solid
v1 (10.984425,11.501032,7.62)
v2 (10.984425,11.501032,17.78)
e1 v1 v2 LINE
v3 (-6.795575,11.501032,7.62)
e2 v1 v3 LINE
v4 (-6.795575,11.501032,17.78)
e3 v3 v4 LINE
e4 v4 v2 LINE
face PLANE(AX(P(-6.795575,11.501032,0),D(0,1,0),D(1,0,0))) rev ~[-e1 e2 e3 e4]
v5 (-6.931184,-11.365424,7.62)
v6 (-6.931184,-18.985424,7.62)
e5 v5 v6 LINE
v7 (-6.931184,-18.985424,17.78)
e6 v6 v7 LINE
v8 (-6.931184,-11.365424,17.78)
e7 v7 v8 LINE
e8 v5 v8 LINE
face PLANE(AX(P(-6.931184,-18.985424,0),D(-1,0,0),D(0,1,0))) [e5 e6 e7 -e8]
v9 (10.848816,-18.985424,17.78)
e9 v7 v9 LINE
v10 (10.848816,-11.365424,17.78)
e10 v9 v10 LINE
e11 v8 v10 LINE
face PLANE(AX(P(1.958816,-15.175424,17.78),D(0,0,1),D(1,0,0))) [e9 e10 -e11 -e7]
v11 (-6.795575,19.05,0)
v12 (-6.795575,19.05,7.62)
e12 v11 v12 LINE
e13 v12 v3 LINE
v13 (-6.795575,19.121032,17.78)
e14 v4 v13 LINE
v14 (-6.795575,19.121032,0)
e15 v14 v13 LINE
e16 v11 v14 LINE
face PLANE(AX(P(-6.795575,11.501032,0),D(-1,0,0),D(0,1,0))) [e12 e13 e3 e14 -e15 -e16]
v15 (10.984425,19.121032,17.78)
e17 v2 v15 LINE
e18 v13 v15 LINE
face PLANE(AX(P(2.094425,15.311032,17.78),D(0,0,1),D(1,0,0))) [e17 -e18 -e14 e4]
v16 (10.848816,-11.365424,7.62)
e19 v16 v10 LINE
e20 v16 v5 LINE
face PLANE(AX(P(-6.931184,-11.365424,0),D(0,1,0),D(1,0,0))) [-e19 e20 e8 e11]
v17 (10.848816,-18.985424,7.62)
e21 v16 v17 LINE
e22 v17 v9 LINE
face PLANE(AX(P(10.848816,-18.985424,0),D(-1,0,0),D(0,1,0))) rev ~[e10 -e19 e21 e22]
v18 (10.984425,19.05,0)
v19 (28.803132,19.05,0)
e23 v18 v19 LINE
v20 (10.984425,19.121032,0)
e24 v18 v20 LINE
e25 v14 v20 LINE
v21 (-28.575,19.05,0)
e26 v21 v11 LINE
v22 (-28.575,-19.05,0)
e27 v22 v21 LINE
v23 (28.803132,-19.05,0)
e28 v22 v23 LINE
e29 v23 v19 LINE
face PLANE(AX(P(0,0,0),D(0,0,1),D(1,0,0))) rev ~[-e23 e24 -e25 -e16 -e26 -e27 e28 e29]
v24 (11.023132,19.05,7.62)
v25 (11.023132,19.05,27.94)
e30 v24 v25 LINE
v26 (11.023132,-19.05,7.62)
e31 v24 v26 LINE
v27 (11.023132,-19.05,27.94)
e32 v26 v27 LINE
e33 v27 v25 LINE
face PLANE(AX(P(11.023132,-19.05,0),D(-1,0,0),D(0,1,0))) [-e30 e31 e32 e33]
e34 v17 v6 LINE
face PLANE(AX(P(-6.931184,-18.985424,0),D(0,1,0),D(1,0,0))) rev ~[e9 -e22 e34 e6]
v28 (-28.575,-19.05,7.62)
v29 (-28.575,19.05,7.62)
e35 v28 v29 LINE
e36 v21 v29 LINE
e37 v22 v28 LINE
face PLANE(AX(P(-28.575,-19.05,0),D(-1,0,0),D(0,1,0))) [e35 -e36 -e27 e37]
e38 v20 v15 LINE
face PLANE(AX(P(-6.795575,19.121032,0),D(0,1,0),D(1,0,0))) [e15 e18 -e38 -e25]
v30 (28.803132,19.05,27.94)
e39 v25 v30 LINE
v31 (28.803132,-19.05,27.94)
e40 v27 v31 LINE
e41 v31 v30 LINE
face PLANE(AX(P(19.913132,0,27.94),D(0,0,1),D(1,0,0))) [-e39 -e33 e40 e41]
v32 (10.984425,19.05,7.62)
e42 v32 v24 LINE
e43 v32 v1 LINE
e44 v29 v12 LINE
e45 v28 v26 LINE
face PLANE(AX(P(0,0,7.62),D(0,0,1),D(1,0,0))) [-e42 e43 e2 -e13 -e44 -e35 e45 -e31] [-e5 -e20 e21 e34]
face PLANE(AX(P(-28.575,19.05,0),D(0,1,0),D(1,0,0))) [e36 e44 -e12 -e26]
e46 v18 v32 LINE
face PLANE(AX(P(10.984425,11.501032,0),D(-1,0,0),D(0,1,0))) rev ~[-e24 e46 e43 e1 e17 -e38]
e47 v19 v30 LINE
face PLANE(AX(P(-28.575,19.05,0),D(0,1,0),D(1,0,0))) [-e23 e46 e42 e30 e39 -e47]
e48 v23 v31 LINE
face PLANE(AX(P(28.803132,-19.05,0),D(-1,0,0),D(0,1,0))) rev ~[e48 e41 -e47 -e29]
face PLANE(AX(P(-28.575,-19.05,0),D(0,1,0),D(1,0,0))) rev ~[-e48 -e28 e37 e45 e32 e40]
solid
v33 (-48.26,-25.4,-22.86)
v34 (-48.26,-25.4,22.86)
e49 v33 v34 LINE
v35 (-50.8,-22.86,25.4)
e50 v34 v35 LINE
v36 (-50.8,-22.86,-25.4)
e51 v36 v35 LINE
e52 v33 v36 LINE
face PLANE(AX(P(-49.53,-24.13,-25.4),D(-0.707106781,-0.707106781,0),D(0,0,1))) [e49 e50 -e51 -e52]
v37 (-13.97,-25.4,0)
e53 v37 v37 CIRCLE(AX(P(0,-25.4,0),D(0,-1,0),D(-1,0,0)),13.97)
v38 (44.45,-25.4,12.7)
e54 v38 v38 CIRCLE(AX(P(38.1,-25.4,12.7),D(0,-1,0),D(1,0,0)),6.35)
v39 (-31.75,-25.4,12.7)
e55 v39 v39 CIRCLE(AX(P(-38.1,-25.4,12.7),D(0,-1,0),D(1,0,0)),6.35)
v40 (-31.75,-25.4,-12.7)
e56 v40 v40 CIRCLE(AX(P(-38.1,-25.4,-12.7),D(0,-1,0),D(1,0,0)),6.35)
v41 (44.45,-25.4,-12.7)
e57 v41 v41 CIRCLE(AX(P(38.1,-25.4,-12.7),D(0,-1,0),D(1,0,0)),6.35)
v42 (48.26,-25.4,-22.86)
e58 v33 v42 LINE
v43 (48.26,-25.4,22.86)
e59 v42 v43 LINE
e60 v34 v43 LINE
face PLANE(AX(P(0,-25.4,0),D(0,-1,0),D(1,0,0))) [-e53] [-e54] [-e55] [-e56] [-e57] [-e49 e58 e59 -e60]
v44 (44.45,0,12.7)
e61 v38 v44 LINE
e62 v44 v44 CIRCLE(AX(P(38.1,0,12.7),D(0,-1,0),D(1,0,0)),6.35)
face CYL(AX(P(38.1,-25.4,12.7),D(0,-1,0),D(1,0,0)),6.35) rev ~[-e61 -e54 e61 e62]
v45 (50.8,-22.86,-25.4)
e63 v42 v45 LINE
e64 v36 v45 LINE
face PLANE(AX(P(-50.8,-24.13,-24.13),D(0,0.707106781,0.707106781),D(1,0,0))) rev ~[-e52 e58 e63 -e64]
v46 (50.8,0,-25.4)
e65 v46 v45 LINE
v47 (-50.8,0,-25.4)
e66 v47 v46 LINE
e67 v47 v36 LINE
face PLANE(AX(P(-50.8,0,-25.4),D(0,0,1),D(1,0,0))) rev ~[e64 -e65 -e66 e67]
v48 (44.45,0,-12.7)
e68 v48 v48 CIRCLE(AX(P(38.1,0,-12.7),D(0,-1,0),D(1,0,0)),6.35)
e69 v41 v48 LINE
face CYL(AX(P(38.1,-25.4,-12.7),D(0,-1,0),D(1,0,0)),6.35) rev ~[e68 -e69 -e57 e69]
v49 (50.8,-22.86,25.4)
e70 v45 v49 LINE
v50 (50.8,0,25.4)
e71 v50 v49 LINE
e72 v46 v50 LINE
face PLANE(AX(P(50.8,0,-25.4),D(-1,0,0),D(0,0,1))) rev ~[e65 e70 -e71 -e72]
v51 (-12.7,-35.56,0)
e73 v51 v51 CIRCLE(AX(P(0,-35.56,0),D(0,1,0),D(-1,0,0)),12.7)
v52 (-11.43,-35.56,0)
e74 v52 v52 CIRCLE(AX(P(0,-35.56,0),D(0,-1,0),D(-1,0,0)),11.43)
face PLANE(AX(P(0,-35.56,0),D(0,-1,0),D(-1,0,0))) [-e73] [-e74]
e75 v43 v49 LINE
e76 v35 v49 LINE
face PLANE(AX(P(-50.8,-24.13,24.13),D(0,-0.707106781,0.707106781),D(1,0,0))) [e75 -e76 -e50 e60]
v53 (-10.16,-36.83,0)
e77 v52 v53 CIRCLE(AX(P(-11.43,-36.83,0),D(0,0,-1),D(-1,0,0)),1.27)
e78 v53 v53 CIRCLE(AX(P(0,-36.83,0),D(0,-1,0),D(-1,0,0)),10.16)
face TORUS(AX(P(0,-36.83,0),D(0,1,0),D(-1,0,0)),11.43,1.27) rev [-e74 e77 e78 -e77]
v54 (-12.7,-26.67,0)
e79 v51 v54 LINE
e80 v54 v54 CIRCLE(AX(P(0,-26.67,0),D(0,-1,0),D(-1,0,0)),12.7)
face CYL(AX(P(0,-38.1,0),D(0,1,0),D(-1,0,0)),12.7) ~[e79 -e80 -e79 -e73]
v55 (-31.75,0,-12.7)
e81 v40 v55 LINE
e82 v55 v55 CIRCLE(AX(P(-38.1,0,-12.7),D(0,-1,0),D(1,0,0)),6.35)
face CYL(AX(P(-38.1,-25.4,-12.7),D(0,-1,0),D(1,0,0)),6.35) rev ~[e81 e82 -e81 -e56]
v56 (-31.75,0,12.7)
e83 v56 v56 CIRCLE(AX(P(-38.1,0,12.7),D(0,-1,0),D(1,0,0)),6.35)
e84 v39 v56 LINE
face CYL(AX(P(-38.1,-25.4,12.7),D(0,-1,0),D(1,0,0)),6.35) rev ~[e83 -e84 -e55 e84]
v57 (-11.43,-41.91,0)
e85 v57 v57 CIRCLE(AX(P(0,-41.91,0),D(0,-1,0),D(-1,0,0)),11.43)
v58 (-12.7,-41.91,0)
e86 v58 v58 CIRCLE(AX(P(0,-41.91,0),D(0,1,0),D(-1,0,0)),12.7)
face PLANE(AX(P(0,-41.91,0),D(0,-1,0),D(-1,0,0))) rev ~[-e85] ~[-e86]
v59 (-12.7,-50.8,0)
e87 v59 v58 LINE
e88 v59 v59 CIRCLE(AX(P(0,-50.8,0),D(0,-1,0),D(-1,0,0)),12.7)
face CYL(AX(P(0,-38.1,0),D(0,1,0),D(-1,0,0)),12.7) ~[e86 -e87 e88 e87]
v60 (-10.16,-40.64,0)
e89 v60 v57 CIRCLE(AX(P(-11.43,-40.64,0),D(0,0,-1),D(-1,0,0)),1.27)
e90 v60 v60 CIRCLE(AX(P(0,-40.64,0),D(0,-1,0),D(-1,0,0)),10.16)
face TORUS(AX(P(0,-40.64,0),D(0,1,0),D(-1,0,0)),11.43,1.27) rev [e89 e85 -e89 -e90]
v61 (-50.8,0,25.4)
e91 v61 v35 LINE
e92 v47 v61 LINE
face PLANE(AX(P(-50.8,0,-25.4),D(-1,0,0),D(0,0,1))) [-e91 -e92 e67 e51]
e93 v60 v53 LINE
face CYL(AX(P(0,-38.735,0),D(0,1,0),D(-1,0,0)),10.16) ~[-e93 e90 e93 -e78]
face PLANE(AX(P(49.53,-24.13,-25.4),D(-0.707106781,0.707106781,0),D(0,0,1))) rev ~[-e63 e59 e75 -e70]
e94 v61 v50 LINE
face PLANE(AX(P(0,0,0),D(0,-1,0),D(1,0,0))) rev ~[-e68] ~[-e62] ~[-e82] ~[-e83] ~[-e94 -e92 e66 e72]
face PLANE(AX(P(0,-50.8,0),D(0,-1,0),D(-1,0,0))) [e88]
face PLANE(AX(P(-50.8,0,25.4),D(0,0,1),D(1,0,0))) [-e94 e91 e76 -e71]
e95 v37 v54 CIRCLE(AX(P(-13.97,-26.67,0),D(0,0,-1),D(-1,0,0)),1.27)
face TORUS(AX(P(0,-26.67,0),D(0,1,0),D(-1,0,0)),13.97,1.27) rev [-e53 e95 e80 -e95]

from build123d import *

# Parameters (mm, degrees)
F0_W      = 101.6
F0_H      = 50.8
F1_DEPTH  = 25.4
F2_R      = 6.35
F3_DEPTH  = 25.401
F4_W      = 12.7
F4_H      = 25.4
F6_W      = 5.7951804488
F6_H      = 6.35
F8_R      = 1.27
F9_SIZE   = 2.54
F10_W     = 57.15
F10_H     = 38.1
F11_DEPTH = 7.62
F12_W     = 17.78
F12_H     = 38.1
F13_DEPTH = 27.94
F14_W     = 17.78
F14_H     = 7.62
F15_DEPTH = 17.78


with BuildPart() as f1:
    # F0 (on Front) → F1 (new body)
    with BuildSketch(Plane.XZ):
        Rectangle(F0_W, F0_H)
    extrude(amount=F1_DEPTH)

    # F2 (on face) → F3 (cut, through all)
    with BuildSketch(Plane.XZ.offset(25.4)):
        with Locations((-38.1, 12.7)):
            Circle(F2_R)
        with Locations((-38.1, -12.7)):
            Circle(F2_R)
        with Locations((38.1, 12.7)):
            Circle(F2_R)
        with Locations((38.1, -12.7)):
            Circle(F2_R)
    extrude(amount=-F3_DEPTH, mode=Mode.SUBTRACT)

    # F4 (on Top) → F5 (revolve)
    with BuildSketch(Plane.XY):
        with Locations((-6.35, -38.1)):
            Rectangle(F4_W, F4_H)
    revolve(axis=Axis((0, -38.1, 0), (0, -1, 0)))

    # F6 (on Top) → F7 (revolve, cut)
    with BuildSketch(Plane.XY):
        with Locations((-13.0575902244, -38.735)):
            Rectangle(F6_W, F6_H)
    revolve(axis=Axis((0, -9.0271439403, 0), (0, -1, 0)), mode=Mode.SUBTRACT)

    # F8
    f8_edges = [f1.edges().sort_by_distance(p)[0] for p in [
        (12.7, -25.4, 0),
        (10.16, -41.91, 0),
        (10.16, -35.56, 0),
    ]]
    fillet(f8_edges, radius=F8_R)

    # F9
    f9_edges = [f1.edges().sort_by_distance(p)[0] for p in [
        (0, -25.4, -25.4),
        (-50.8, -25.4, 0),
        (0, -25.4, 25.4),
        (50.8, -25.4, 0),
    ]]
    chamfer(f9_edges, length=F9_SIZE)


with BuildPart() as f11:
    # F10 (on Top) → F11 (new body)
    with BuildSketch(Plane.XY):
        Rectangle(F10_W, F10_H)
    extrude(amount=F11_DEPTH)

    # F12 (on Top) → F13 (join)
    with BuildSketch(Plane.XY):
        with Locations((19.9131323025, 0)):
            Rectangle(F12_W, F12_H)
    extrude(amount=F13_DEPTH)

    # F14 (on Top) → F15 (join)
    with BuildSketch(Plane.XY):
        with Locations((2.094425433, 15.3110322082)):
            Rectangle(F14_W, F14_H)
        with Locations((1.9588155529, -15.1754241908)):
            Rectangle(F14_W, F14_H)
    extrude(amount=F15_DEPTH)


solid = Compound([f1.part, f11.part])
